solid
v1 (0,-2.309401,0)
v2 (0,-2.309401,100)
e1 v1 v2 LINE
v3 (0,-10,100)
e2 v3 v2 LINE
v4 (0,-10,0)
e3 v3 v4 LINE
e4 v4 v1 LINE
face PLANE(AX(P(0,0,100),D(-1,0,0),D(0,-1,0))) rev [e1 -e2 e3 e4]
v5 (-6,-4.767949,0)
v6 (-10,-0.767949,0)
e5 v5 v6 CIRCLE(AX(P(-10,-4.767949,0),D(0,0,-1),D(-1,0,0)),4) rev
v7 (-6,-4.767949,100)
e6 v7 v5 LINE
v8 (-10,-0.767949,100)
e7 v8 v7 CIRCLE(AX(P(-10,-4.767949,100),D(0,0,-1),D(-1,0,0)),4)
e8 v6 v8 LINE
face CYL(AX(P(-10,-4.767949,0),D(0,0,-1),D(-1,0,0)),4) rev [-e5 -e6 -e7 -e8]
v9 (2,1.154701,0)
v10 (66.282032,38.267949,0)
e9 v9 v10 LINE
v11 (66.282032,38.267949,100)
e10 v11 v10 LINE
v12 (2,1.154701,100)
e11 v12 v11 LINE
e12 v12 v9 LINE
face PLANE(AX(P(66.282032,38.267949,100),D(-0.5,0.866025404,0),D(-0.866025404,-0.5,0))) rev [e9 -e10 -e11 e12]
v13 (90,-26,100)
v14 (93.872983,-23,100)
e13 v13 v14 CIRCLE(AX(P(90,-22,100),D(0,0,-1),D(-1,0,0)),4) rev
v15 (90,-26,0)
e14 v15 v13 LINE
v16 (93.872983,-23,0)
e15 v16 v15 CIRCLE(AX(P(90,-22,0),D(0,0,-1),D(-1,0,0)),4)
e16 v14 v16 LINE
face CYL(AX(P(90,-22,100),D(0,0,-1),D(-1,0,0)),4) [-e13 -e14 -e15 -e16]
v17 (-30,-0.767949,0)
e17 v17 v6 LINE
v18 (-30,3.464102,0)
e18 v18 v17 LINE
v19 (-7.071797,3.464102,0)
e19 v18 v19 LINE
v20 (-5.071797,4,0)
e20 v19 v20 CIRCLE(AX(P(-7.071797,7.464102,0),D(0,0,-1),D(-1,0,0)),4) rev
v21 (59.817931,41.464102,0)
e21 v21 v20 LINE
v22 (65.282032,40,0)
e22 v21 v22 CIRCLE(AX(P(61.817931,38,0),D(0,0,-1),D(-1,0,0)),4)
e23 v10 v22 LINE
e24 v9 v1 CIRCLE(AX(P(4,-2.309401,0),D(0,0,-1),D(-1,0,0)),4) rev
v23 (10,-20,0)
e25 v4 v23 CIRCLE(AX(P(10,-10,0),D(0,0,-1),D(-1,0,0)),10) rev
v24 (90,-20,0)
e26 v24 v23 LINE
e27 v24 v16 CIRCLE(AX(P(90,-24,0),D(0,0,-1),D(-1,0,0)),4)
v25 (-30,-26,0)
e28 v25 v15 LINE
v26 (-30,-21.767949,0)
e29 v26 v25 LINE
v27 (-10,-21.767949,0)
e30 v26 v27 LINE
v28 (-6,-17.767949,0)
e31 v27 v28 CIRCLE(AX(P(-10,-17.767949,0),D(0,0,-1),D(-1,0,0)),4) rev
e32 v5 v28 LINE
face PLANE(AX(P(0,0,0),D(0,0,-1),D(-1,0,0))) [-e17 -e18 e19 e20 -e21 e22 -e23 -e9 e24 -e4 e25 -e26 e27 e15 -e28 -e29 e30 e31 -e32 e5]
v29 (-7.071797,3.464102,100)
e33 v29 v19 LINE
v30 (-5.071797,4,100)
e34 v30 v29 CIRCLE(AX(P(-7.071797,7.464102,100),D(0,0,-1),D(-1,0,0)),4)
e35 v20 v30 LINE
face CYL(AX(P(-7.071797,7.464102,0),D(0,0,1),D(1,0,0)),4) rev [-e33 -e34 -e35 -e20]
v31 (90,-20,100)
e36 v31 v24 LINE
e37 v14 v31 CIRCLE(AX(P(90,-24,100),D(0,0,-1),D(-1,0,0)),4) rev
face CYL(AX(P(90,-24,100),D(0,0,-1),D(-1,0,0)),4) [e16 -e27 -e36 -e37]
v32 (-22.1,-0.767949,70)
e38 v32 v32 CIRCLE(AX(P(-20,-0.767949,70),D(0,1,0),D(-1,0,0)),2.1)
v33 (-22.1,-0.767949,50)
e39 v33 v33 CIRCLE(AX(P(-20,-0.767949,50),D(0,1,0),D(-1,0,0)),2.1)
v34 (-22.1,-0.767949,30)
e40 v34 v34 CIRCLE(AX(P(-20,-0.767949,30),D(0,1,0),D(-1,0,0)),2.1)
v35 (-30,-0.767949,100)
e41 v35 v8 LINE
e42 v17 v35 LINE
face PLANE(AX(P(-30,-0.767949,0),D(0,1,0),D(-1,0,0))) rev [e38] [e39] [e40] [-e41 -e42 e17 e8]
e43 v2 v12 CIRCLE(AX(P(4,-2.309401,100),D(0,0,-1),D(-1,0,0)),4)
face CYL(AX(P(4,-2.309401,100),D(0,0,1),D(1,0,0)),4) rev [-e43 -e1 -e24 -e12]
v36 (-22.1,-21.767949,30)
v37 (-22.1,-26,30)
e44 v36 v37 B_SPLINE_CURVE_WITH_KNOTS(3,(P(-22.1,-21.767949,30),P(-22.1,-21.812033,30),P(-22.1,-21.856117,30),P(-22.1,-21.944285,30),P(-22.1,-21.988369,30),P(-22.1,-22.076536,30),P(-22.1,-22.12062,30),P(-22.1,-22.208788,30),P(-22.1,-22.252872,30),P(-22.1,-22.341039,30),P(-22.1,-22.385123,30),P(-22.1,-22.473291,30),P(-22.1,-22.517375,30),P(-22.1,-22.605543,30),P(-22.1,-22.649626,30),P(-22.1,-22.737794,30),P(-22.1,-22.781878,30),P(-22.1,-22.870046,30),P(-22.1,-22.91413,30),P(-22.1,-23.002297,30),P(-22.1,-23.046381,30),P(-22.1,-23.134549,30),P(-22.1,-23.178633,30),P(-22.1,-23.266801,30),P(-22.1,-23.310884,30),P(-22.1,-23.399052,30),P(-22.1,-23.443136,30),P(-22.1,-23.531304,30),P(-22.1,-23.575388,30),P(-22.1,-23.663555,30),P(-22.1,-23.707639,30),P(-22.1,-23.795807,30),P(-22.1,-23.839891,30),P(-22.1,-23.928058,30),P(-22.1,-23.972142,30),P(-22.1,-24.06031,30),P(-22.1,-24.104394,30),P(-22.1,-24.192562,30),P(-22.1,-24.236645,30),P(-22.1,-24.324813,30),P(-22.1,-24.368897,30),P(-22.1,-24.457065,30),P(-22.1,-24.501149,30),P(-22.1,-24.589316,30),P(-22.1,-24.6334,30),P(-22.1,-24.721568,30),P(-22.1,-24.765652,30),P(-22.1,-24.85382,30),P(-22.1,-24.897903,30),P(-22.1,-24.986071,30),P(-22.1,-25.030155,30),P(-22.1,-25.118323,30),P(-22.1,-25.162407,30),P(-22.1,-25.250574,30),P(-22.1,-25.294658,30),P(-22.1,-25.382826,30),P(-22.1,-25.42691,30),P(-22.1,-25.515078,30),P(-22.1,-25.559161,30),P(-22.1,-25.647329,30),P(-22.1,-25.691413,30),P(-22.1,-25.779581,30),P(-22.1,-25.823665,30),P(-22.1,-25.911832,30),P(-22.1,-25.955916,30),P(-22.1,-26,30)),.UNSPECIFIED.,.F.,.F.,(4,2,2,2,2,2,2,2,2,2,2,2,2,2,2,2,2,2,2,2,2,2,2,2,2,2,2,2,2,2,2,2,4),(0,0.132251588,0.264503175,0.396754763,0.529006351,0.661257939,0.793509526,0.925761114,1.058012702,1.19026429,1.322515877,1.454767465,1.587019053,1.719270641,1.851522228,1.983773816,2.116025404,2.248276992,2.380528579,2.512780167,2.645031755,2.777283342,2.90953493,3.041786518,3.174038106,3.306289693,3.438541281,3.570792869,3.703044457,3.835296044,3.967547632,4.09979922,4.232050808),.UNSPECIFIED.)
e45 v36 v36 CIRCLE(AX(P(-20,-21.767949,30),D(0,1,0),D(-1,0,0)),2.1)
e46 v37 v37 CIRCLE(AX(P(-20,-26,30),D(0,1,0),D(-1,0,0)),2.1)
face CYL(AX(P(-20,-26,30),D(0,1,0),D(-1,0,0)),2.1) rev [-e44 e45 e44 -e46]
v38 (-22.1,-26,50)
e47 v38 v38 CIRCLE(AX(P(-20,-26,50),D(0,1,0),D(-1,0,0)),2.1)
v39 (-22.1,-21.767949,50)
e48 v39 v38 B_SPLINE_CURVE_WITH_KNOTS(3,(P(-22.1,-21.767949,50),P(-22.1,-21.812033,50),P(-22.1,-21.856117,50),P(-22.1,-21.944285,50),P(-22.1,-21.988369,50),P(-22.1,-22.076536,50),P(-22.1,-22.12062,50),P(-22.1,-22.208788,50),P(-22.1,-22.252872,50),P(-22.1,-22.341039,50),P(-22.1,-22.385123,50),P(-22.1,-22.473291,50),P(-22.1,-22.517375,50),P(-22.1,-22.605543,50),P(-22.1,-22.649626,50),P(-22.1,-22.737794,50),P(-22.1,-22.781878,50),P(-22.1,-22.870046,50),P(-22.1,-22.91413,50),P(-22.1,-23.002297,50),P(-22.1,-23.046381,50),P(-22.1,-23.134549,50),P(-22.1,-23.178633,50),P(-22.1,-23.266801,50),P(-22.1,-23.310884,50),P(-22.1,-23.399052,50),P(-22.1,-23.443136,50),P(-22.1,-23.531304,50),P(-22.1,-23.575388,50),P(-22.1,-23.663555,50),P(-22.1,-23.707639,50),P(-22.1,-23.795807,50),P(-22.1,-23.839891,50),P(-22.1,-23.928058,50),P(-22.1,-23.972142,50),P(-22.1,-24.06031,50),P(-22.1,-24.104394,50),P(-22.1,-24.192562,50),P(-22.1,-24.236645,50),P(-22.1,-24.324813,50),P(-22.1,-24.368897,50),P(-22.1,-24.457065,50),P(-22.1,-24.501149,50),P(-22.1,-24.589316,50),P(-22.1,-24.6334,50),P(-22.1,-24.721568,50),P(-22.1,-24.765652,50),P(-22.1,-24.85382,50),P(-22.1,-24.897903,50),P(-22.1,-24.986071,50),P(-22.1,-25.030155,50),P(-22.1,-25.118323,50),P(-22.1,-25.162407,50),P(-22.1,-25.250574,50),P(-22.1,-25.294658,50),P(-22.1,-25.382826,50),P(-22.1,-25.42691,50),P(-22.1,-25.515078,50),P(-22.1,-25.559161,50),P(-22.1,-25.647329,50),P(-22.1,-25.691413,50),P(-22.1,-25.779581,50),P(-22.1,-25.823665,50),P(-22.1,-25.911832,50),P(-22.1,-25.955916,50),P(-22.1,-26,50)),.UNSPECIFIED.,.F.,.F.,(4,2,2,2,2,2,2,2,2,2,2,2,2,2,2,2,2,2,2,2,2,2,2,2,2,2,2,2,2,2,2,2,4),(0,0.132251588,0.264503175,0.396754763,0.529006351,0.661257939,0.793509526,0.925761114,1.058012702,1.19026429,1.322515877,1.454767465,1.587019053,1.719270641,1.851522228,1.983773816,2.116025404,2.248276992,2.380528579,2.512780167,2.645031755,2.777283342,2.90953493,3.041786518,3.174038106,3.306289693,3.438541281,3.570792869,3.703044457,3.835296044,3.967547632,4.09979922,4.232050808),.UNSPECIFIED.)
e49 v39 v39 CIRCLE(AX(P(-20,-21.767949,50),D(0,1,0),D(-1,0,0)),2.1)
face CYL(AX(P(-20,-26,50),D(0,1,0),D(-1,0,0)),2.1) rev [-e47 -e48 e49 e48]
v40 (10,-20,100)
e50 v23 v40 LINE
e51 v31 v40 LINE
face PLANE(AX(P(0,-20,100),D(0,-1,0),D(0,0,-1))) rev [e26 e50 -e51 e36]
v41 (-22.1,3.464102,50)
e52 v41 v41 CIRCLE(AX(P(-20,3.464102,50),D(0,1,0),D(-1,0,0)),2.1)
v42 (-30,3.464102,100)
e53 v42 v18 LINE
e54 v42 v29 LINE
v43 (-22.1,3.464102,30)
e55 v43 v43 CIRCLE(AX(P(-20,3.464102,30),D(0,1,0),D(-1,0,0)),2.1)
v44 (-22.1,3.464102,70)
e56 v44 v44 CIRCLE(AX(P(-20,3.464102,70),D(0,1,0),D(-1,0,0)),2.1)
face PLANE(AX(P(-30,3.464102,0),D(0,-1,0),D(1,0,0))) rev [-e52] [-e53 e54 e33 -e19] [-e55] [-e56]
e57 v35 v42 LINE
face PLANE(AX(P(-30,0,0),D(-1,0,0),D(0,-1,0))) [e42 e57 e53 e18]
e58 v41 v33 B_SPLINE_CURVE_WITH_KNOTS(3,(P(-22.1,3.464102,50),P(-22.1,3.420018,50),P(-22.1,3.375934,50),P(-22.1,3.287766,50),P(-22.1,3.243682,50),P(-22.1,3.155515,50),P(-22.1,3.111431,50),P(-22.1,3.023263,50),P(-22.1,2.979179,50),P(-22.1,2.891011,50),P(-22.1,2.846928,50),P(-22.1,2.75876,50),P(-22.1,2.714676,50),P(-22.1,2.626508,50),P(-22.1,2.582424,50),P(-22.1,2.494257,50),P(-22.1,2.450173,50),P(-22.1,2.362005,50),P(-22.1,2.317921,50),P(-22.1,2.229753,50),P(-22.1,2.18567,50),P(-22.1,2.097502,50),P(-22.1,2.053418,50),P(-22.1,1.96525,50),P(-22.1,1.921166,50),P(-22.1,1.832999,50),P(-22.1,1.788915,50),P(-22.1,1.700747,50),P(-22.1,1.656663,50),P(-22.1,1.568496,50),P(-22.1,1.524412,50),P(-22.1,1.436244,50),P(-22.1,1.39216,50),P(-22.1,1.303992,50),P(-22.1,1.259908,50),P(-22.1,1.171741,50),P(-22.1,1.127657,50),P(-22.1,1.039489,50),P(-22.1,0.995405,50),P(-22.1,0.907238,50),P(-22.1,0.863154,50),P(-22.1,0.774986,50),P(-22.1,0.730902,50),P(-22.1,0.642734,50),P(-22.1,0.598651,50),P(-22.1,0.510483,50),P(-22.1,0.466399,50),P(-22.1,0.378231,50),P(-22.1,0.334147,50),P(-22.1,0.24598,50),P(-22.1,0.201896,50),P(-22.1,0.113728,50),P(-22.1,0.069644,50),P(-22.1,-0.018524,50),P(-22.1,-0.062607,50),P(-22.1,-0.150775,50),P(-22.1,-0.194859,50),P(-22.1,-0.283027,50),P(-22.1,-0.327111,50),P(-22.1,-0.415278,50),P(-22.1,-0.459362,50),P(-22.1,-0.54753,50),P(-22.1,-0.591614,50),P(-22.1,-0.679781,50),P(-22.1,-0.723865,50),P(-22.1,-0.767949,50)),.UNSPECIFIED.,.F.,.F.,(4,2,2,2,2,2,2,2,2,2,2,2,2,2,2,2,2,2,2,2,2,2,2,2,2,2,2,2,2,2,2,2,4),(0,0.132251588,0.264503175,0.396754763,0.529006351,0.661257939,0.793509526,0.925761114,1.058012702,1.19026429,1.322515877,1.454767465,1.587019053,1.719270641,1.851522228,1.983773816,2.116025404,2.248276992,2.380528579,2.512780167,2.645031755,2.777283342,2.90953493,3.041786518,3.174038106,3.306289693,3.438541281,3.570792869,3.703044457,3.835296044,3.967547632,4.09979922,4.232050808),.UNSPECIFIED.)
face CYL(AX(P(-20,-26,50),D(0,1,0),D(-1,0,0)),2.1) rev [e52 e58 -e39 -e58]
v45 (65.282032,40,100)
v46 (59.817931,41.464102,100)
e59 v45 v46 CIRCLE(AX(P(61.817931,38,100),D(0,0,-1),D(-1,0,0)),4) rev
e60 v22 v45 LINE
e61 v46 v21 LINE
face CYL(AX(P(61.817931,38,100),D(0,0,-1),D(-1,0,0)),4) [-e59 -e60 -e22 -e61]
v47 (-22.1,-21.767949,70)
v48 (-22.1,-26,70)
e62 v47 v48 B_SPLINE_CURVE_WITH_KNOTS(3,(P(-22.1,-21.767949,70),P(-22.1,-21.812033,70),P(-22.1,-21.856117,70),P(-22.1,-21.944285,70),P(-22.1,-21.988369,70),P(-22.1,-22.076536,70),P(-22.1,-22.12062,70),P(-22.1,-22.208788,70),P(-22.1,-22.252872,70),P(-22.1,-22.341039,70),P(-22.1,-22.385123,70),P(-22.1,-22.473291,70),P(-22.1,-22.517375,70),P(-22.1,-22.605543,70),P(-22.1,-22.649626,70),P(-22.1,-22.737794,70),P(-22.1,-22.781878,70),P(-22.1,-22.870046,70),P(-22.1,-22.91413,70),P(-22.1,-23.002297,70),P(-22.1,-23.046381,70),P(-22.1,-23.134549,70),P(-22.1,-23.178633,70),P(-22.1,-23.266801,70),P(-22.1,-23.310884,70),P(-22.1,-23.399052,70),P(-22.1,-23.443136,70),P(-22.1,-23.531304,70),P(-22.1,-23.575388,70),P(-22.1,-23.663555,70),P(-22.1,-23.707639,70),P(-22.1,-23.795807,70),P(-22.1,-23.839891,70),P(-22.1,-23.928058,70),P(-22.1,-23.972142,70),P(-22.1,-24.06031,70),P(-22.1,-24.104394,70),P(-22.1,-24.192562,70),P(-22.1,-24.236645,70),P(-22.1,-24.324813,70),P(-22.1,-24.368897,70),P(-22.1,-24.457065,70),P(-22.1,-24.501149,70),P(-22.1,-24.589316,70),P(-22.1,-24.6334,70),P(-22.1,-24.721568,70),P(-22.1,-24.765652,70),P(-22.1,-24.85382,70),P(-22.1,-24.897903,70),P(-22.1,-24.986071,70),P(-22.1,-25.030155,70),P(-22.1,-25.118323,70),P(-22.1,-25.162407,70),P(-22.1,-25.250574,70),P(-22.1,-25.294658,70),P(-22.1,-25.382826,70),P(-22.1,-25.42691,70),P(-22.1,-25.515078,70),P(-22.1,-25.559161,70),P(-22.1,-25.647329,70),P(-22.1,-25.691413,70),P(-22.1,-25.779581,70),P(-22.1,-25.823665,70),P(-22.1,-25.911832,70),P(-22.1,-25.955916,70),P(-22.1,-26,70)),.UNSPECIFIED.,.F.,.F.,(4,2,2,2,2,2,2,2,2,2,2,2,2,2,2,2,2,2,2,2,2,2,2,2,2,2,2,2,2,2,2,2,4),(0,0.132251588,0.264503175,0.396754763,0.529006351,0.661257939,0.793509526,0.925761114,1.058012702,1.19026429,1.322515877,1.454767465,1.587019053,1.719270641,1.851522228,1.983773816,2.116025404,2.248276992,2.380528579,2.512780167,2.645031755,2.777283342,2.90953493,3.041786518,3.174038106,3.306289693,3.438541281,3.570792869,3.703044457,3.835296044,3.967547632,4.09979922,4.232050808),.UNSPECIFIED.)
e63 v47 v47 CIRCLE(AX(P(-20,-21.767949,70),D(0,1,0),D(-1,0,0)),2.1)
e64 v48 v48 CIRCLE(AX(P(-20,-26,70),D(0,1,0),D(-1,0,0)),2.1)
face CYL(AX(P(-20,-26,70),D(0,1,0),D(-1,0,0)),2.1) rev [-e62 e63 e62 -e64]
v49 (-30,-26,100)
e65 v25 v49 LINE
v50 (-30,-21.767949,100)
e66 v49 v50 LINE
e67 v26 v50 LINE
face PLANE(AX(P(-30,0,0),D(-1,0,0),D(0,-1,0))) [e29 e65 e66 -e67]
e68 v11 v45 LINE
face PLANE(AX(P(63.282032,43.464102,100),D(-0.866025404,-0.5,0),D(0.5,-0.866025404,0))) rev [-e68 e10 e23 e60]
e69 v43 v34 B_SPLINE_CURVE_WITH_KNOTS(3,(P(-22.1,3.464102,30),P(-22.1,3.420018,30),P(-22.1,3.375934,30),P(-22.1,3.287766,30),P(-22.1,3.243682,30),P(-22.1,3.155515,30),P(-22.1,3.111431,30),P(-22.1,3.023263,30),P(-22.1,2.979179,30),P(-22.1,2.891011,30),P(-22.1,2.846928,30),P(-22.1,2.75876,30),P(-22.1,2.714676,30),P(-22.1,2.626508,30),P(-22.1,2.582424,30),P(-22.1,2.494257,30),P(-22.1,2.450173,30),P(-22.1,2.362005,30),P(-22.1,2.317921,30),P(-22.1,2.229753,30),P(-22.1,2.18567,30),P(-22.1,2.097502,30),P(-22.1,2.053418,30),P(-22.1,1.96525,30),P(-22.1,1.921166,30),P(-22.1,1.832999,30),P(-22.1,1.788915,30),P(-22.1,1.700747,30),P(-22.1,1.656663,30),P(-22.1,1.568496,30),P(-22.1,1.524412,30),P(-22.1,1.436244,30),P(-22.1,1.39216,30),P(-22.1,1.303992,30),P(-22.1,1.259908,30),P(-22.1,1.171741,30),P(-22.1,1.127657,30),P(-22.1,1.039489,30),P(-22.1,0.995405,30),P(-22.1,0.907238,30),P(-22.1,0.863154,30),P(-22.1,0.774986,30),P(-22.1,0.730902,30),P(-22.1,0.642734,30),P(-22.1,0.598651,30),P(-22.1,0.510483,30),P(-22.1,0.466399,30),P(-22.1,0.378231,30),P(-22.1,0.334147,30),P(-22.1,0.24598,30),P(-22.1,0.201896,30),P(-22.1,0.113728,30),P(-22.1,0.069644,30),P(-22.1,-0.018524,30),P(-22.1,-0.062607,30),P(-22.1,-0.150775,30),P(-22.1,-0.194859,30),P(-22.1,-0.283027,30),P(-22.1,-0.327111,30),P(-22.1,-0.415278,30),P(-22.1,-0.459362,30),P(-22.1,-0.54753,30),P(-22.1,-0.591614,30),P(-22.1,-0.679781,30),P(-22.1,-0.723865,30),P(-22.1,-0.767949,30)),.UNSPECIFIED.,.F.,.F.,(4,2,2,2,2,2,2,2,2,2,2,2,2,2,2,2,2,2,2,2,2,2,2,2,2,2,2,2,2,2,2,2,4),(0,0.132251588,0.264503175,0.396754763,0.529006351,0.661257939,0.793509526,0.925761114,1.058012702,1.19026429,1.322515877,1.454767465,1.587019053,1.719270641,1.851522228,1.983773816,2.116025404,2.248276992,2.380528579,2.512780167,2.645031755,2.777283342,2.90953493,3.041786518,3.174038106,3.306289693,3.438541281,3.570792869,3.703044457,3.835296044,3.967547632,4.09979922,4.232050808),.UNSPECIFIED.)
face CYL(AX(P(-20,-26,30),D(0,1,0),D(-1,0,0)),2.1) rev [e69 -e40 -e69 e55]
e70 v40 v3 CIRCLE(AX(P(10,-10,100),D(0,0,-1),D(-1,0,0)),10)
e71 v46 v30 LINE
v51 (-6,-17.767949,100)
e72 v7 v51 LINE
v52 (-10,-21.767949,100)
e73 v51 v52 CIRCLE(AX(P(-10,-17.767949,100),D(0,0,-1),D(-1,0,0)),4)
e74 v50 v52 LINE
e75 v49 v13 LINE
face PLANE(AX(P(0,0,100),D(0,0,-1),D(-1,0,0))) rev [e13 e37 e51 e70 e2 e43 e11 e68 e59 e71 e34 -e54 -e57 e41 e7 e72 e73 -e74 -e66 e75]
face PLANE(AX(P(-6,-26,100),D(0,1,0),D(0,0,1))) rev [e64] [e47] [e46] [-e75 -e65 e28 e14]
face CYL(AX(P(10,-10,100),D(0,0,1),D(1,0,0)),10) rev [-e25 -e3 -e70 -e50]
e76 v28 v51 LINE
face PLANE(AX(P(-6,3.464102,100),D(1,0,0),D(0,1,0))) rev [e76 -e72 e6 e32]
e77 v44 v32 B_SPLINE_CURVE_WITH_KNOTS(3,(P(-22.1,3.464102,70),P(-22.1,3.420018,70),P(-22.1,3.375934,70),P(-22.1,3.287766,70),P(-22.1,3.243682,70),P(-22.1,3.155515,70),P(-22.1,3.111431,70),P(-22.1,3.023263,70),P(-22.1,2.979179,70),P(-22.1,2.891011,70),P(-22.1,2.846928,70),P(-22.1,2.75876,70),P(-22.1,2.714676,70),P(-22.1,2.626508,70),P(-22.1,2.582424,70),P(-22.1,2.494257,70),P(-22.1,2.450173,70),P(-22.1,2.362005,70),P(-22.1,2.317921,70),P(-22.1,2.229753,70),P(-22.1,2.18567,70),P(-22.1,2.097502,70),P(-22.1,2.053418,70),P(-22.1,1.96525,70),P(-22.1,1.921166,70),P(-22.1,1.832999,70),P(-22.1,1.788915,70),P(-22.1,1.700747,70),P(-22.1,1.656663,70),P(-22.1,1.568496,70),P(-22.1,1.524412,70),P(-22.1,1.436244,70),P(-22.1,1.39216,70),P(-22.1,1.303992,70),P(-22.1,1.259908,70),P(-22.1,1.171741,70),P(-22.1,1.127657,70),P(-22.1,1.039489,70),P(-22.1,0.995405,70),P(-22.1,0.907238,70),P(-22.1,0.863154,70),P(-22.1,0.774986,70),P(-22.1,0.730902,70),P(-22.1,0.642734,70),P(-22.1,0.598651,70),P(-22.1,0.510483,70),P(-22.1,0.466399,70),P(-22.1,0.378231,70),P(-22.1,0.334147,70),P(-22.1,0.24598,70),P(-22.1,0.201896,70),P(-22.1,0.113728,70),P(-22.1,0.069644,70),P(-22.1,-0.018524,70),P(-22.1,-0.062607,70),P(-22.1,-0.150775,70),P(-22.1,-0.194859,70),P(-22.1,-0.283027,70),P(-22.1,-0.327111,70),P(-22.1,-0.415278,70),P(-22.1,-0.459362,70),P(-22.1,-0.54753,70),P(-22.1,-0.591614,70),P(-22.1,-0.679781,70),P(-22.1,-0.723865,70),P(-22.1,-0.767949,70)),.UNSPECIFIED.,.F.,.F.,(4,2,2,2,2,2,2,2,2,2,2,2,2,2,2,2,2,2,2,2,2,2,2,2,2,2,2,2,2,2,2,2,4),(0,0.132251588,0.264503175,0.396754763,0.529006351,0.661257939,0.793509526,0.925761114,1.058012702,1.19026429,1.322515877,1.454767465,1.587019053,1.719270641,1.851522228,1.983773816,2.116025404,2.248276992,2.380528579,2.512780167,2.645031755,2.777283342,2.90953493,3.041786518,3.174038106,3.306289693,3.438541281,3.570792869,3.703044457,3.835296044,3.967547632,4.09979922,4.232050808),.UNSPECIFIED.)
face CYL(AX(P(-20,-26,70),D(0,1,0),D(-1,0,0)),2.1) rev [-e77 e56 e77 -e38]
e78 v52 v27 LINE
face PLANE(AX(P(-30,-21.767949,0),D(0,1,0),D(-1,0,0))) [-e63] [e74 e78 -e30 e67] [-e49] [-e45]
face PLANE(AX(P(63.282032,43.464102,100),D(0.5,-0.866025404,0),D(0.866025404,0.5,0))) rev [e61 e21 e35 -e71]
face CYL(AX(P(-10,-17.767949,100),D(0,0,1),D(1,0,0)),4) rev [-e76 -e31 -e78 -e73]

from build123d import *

# Parameters (mm, degrees)
EXTRUDE_1_DEPTH     = 100
FILLET_1_R          = 4
SKETCH_2_W          = 100
SKETCH_2_H          = 4.232050807
SKETCH_2_H_2        = 4.232050808
EXTRUDE_2_DEPTH     = 24
FILLET_2_R          = 4
FILLET_3_R          = 4
SKETCH_3_R          = 2.1
CUT_EXTRUDE_2_DEPTH = 143.468075254
FILLET_4_R          = 10


with BuildPart() as part:
    # 草图1 → 凸台-拉伸1 (new body)
    with BuildSketch(Plane.XY):
        Polygon((66.282032303, 38.267949192), (0, 0), (0, -20), (94, -20), (94, -26), (-6, -26), (-6, 3.464101615), (63.282032303, 43.464101615), align=None)
    extrude(amount=EXTRUDE_1_DEPTH)

    # 圆角1
    # the kernel refuses this fillet: 4 mm, written as the material it adds along each edge
    with BuildSketch(Plane(origin=(0, 0, 0), x_dir=(0.8660254037844385, 0.5000000000000003, 0), z_dir=(0, 0, 1))) as fillet_1_piece_1:
        with BuildLine():
            CenterArc((FILLET_1_R * 0.57735026919, -FILLET_1_R), FILLET_1_R, 90, 60)
            Line((-FILLET_1_R * 0.288675134595, -FILLET_1_R * 0.5), (0, 0))
            Line((0, 0), (FILLET_1_R * 0.57735026919, 0))
        make_face()
    extrude(amount=100)
    # the kernel refuses this fillet: 4 mm, written as the material it takes off along each edge
    with BuildSketch(Plane(origin=(94, -20, -10), x_dir=(-1, 0, 0), z_dir=(0, 0, 1)), Plane(origin=(94, -26, -10), x_dir=(0, 1, 0), z_dir=(0, 0, 1))) as fillet_1_2_piece_1:
        with BuildLine():
            CenterArc((FILLET_1_R, FILLET_1_R), FILLET_1_R, 180, 90)
            Line((0, FILLET_1_R), (0, 0))
            Line((0, 0), (FILLET_1_R, 0))
        make_face()
    extrude(amount=120, mode=Mode.SUBTRACT)
    with BuildSketch(Plane(origin=(63.282032303, 43.464101615, -10), x_dir=(0.49999999999999706, -0.8660254037844404, 0), z_dir=(0, 0, 1))) as fillet_1_2_piece_2:
        with BuildLine():
            CenterArc((FILLET_1_R, -FILLET_1_R), FILLET_1_R, 90, 90)
            Line((0, -FILLET_1_R), (0, 0))
            Line((0, 0), (FILLET_1_R, 0))
        make_face()
    extrude(amount=120, mode=Mode.SUBTRACT)

    # 草图2 → 凸台-拉伸2 (add)
    with BuildSketch(Plane.ZY.offset(6)):
        with Locations((50, 1.348076212)):
            Rectangle(SKETCH_2_W, SKETCH_2_H)
        with Locations((50, -23.883974596)):
            Rectangle(SKETCH_2_W, SKETCH_2_H_2)
    extrude(amount=EXTRUDE_2_DEPTH)

    # 圆角2
    fillet_2_edges = [part.edges().sort_by_distance(p)[0] for p in [
        (-6, -0.767949192, 50),
        (-6, -21.767949192, 50),
    ]]
    fillet(fillet_2_edges, radius=FILLET_2_R)

    # 圆角3
    fillet_3_edges = [part.edges().sort_by_distance(p)[0] for p in [
        (-6, 3.464101615, 50),
    ]]
    fillet(fillet_3_edges, radius=FILLET_3_R)

    # 草图3 → 切除-拉伸2 (cut, through all)
    with BuildSketch(Plane(origin=(0, 3.464101615, 0), x_dir=(1, 0, 0), z_dir=(0, 1, 0))):
        with Locations(Location((-20, -30, 0), (0, 0, 180))):
            Circle(SKETCH_3_R)
        with Locations(Location((-20, -50, 0), (0, 0, 180))):
            Circle(SKETCH_3_R)
        with Locations(Location((-20, -70, 0), (0, 0, 180))):
            Circle(SKETCH_3_R)
    extrude(amount=-CUT_EXTRUDE_2_DEPTH, mode=Mode.SUBTRACT)

    # 圆角4
    fillet_4_edges = [part.edges().sort_by_distance(p)[0] for p in [
        (0, -20, 50),
    ]]
    fillet(fillet_4_edges, radius=FILLET_4_R)


solid = part.part
